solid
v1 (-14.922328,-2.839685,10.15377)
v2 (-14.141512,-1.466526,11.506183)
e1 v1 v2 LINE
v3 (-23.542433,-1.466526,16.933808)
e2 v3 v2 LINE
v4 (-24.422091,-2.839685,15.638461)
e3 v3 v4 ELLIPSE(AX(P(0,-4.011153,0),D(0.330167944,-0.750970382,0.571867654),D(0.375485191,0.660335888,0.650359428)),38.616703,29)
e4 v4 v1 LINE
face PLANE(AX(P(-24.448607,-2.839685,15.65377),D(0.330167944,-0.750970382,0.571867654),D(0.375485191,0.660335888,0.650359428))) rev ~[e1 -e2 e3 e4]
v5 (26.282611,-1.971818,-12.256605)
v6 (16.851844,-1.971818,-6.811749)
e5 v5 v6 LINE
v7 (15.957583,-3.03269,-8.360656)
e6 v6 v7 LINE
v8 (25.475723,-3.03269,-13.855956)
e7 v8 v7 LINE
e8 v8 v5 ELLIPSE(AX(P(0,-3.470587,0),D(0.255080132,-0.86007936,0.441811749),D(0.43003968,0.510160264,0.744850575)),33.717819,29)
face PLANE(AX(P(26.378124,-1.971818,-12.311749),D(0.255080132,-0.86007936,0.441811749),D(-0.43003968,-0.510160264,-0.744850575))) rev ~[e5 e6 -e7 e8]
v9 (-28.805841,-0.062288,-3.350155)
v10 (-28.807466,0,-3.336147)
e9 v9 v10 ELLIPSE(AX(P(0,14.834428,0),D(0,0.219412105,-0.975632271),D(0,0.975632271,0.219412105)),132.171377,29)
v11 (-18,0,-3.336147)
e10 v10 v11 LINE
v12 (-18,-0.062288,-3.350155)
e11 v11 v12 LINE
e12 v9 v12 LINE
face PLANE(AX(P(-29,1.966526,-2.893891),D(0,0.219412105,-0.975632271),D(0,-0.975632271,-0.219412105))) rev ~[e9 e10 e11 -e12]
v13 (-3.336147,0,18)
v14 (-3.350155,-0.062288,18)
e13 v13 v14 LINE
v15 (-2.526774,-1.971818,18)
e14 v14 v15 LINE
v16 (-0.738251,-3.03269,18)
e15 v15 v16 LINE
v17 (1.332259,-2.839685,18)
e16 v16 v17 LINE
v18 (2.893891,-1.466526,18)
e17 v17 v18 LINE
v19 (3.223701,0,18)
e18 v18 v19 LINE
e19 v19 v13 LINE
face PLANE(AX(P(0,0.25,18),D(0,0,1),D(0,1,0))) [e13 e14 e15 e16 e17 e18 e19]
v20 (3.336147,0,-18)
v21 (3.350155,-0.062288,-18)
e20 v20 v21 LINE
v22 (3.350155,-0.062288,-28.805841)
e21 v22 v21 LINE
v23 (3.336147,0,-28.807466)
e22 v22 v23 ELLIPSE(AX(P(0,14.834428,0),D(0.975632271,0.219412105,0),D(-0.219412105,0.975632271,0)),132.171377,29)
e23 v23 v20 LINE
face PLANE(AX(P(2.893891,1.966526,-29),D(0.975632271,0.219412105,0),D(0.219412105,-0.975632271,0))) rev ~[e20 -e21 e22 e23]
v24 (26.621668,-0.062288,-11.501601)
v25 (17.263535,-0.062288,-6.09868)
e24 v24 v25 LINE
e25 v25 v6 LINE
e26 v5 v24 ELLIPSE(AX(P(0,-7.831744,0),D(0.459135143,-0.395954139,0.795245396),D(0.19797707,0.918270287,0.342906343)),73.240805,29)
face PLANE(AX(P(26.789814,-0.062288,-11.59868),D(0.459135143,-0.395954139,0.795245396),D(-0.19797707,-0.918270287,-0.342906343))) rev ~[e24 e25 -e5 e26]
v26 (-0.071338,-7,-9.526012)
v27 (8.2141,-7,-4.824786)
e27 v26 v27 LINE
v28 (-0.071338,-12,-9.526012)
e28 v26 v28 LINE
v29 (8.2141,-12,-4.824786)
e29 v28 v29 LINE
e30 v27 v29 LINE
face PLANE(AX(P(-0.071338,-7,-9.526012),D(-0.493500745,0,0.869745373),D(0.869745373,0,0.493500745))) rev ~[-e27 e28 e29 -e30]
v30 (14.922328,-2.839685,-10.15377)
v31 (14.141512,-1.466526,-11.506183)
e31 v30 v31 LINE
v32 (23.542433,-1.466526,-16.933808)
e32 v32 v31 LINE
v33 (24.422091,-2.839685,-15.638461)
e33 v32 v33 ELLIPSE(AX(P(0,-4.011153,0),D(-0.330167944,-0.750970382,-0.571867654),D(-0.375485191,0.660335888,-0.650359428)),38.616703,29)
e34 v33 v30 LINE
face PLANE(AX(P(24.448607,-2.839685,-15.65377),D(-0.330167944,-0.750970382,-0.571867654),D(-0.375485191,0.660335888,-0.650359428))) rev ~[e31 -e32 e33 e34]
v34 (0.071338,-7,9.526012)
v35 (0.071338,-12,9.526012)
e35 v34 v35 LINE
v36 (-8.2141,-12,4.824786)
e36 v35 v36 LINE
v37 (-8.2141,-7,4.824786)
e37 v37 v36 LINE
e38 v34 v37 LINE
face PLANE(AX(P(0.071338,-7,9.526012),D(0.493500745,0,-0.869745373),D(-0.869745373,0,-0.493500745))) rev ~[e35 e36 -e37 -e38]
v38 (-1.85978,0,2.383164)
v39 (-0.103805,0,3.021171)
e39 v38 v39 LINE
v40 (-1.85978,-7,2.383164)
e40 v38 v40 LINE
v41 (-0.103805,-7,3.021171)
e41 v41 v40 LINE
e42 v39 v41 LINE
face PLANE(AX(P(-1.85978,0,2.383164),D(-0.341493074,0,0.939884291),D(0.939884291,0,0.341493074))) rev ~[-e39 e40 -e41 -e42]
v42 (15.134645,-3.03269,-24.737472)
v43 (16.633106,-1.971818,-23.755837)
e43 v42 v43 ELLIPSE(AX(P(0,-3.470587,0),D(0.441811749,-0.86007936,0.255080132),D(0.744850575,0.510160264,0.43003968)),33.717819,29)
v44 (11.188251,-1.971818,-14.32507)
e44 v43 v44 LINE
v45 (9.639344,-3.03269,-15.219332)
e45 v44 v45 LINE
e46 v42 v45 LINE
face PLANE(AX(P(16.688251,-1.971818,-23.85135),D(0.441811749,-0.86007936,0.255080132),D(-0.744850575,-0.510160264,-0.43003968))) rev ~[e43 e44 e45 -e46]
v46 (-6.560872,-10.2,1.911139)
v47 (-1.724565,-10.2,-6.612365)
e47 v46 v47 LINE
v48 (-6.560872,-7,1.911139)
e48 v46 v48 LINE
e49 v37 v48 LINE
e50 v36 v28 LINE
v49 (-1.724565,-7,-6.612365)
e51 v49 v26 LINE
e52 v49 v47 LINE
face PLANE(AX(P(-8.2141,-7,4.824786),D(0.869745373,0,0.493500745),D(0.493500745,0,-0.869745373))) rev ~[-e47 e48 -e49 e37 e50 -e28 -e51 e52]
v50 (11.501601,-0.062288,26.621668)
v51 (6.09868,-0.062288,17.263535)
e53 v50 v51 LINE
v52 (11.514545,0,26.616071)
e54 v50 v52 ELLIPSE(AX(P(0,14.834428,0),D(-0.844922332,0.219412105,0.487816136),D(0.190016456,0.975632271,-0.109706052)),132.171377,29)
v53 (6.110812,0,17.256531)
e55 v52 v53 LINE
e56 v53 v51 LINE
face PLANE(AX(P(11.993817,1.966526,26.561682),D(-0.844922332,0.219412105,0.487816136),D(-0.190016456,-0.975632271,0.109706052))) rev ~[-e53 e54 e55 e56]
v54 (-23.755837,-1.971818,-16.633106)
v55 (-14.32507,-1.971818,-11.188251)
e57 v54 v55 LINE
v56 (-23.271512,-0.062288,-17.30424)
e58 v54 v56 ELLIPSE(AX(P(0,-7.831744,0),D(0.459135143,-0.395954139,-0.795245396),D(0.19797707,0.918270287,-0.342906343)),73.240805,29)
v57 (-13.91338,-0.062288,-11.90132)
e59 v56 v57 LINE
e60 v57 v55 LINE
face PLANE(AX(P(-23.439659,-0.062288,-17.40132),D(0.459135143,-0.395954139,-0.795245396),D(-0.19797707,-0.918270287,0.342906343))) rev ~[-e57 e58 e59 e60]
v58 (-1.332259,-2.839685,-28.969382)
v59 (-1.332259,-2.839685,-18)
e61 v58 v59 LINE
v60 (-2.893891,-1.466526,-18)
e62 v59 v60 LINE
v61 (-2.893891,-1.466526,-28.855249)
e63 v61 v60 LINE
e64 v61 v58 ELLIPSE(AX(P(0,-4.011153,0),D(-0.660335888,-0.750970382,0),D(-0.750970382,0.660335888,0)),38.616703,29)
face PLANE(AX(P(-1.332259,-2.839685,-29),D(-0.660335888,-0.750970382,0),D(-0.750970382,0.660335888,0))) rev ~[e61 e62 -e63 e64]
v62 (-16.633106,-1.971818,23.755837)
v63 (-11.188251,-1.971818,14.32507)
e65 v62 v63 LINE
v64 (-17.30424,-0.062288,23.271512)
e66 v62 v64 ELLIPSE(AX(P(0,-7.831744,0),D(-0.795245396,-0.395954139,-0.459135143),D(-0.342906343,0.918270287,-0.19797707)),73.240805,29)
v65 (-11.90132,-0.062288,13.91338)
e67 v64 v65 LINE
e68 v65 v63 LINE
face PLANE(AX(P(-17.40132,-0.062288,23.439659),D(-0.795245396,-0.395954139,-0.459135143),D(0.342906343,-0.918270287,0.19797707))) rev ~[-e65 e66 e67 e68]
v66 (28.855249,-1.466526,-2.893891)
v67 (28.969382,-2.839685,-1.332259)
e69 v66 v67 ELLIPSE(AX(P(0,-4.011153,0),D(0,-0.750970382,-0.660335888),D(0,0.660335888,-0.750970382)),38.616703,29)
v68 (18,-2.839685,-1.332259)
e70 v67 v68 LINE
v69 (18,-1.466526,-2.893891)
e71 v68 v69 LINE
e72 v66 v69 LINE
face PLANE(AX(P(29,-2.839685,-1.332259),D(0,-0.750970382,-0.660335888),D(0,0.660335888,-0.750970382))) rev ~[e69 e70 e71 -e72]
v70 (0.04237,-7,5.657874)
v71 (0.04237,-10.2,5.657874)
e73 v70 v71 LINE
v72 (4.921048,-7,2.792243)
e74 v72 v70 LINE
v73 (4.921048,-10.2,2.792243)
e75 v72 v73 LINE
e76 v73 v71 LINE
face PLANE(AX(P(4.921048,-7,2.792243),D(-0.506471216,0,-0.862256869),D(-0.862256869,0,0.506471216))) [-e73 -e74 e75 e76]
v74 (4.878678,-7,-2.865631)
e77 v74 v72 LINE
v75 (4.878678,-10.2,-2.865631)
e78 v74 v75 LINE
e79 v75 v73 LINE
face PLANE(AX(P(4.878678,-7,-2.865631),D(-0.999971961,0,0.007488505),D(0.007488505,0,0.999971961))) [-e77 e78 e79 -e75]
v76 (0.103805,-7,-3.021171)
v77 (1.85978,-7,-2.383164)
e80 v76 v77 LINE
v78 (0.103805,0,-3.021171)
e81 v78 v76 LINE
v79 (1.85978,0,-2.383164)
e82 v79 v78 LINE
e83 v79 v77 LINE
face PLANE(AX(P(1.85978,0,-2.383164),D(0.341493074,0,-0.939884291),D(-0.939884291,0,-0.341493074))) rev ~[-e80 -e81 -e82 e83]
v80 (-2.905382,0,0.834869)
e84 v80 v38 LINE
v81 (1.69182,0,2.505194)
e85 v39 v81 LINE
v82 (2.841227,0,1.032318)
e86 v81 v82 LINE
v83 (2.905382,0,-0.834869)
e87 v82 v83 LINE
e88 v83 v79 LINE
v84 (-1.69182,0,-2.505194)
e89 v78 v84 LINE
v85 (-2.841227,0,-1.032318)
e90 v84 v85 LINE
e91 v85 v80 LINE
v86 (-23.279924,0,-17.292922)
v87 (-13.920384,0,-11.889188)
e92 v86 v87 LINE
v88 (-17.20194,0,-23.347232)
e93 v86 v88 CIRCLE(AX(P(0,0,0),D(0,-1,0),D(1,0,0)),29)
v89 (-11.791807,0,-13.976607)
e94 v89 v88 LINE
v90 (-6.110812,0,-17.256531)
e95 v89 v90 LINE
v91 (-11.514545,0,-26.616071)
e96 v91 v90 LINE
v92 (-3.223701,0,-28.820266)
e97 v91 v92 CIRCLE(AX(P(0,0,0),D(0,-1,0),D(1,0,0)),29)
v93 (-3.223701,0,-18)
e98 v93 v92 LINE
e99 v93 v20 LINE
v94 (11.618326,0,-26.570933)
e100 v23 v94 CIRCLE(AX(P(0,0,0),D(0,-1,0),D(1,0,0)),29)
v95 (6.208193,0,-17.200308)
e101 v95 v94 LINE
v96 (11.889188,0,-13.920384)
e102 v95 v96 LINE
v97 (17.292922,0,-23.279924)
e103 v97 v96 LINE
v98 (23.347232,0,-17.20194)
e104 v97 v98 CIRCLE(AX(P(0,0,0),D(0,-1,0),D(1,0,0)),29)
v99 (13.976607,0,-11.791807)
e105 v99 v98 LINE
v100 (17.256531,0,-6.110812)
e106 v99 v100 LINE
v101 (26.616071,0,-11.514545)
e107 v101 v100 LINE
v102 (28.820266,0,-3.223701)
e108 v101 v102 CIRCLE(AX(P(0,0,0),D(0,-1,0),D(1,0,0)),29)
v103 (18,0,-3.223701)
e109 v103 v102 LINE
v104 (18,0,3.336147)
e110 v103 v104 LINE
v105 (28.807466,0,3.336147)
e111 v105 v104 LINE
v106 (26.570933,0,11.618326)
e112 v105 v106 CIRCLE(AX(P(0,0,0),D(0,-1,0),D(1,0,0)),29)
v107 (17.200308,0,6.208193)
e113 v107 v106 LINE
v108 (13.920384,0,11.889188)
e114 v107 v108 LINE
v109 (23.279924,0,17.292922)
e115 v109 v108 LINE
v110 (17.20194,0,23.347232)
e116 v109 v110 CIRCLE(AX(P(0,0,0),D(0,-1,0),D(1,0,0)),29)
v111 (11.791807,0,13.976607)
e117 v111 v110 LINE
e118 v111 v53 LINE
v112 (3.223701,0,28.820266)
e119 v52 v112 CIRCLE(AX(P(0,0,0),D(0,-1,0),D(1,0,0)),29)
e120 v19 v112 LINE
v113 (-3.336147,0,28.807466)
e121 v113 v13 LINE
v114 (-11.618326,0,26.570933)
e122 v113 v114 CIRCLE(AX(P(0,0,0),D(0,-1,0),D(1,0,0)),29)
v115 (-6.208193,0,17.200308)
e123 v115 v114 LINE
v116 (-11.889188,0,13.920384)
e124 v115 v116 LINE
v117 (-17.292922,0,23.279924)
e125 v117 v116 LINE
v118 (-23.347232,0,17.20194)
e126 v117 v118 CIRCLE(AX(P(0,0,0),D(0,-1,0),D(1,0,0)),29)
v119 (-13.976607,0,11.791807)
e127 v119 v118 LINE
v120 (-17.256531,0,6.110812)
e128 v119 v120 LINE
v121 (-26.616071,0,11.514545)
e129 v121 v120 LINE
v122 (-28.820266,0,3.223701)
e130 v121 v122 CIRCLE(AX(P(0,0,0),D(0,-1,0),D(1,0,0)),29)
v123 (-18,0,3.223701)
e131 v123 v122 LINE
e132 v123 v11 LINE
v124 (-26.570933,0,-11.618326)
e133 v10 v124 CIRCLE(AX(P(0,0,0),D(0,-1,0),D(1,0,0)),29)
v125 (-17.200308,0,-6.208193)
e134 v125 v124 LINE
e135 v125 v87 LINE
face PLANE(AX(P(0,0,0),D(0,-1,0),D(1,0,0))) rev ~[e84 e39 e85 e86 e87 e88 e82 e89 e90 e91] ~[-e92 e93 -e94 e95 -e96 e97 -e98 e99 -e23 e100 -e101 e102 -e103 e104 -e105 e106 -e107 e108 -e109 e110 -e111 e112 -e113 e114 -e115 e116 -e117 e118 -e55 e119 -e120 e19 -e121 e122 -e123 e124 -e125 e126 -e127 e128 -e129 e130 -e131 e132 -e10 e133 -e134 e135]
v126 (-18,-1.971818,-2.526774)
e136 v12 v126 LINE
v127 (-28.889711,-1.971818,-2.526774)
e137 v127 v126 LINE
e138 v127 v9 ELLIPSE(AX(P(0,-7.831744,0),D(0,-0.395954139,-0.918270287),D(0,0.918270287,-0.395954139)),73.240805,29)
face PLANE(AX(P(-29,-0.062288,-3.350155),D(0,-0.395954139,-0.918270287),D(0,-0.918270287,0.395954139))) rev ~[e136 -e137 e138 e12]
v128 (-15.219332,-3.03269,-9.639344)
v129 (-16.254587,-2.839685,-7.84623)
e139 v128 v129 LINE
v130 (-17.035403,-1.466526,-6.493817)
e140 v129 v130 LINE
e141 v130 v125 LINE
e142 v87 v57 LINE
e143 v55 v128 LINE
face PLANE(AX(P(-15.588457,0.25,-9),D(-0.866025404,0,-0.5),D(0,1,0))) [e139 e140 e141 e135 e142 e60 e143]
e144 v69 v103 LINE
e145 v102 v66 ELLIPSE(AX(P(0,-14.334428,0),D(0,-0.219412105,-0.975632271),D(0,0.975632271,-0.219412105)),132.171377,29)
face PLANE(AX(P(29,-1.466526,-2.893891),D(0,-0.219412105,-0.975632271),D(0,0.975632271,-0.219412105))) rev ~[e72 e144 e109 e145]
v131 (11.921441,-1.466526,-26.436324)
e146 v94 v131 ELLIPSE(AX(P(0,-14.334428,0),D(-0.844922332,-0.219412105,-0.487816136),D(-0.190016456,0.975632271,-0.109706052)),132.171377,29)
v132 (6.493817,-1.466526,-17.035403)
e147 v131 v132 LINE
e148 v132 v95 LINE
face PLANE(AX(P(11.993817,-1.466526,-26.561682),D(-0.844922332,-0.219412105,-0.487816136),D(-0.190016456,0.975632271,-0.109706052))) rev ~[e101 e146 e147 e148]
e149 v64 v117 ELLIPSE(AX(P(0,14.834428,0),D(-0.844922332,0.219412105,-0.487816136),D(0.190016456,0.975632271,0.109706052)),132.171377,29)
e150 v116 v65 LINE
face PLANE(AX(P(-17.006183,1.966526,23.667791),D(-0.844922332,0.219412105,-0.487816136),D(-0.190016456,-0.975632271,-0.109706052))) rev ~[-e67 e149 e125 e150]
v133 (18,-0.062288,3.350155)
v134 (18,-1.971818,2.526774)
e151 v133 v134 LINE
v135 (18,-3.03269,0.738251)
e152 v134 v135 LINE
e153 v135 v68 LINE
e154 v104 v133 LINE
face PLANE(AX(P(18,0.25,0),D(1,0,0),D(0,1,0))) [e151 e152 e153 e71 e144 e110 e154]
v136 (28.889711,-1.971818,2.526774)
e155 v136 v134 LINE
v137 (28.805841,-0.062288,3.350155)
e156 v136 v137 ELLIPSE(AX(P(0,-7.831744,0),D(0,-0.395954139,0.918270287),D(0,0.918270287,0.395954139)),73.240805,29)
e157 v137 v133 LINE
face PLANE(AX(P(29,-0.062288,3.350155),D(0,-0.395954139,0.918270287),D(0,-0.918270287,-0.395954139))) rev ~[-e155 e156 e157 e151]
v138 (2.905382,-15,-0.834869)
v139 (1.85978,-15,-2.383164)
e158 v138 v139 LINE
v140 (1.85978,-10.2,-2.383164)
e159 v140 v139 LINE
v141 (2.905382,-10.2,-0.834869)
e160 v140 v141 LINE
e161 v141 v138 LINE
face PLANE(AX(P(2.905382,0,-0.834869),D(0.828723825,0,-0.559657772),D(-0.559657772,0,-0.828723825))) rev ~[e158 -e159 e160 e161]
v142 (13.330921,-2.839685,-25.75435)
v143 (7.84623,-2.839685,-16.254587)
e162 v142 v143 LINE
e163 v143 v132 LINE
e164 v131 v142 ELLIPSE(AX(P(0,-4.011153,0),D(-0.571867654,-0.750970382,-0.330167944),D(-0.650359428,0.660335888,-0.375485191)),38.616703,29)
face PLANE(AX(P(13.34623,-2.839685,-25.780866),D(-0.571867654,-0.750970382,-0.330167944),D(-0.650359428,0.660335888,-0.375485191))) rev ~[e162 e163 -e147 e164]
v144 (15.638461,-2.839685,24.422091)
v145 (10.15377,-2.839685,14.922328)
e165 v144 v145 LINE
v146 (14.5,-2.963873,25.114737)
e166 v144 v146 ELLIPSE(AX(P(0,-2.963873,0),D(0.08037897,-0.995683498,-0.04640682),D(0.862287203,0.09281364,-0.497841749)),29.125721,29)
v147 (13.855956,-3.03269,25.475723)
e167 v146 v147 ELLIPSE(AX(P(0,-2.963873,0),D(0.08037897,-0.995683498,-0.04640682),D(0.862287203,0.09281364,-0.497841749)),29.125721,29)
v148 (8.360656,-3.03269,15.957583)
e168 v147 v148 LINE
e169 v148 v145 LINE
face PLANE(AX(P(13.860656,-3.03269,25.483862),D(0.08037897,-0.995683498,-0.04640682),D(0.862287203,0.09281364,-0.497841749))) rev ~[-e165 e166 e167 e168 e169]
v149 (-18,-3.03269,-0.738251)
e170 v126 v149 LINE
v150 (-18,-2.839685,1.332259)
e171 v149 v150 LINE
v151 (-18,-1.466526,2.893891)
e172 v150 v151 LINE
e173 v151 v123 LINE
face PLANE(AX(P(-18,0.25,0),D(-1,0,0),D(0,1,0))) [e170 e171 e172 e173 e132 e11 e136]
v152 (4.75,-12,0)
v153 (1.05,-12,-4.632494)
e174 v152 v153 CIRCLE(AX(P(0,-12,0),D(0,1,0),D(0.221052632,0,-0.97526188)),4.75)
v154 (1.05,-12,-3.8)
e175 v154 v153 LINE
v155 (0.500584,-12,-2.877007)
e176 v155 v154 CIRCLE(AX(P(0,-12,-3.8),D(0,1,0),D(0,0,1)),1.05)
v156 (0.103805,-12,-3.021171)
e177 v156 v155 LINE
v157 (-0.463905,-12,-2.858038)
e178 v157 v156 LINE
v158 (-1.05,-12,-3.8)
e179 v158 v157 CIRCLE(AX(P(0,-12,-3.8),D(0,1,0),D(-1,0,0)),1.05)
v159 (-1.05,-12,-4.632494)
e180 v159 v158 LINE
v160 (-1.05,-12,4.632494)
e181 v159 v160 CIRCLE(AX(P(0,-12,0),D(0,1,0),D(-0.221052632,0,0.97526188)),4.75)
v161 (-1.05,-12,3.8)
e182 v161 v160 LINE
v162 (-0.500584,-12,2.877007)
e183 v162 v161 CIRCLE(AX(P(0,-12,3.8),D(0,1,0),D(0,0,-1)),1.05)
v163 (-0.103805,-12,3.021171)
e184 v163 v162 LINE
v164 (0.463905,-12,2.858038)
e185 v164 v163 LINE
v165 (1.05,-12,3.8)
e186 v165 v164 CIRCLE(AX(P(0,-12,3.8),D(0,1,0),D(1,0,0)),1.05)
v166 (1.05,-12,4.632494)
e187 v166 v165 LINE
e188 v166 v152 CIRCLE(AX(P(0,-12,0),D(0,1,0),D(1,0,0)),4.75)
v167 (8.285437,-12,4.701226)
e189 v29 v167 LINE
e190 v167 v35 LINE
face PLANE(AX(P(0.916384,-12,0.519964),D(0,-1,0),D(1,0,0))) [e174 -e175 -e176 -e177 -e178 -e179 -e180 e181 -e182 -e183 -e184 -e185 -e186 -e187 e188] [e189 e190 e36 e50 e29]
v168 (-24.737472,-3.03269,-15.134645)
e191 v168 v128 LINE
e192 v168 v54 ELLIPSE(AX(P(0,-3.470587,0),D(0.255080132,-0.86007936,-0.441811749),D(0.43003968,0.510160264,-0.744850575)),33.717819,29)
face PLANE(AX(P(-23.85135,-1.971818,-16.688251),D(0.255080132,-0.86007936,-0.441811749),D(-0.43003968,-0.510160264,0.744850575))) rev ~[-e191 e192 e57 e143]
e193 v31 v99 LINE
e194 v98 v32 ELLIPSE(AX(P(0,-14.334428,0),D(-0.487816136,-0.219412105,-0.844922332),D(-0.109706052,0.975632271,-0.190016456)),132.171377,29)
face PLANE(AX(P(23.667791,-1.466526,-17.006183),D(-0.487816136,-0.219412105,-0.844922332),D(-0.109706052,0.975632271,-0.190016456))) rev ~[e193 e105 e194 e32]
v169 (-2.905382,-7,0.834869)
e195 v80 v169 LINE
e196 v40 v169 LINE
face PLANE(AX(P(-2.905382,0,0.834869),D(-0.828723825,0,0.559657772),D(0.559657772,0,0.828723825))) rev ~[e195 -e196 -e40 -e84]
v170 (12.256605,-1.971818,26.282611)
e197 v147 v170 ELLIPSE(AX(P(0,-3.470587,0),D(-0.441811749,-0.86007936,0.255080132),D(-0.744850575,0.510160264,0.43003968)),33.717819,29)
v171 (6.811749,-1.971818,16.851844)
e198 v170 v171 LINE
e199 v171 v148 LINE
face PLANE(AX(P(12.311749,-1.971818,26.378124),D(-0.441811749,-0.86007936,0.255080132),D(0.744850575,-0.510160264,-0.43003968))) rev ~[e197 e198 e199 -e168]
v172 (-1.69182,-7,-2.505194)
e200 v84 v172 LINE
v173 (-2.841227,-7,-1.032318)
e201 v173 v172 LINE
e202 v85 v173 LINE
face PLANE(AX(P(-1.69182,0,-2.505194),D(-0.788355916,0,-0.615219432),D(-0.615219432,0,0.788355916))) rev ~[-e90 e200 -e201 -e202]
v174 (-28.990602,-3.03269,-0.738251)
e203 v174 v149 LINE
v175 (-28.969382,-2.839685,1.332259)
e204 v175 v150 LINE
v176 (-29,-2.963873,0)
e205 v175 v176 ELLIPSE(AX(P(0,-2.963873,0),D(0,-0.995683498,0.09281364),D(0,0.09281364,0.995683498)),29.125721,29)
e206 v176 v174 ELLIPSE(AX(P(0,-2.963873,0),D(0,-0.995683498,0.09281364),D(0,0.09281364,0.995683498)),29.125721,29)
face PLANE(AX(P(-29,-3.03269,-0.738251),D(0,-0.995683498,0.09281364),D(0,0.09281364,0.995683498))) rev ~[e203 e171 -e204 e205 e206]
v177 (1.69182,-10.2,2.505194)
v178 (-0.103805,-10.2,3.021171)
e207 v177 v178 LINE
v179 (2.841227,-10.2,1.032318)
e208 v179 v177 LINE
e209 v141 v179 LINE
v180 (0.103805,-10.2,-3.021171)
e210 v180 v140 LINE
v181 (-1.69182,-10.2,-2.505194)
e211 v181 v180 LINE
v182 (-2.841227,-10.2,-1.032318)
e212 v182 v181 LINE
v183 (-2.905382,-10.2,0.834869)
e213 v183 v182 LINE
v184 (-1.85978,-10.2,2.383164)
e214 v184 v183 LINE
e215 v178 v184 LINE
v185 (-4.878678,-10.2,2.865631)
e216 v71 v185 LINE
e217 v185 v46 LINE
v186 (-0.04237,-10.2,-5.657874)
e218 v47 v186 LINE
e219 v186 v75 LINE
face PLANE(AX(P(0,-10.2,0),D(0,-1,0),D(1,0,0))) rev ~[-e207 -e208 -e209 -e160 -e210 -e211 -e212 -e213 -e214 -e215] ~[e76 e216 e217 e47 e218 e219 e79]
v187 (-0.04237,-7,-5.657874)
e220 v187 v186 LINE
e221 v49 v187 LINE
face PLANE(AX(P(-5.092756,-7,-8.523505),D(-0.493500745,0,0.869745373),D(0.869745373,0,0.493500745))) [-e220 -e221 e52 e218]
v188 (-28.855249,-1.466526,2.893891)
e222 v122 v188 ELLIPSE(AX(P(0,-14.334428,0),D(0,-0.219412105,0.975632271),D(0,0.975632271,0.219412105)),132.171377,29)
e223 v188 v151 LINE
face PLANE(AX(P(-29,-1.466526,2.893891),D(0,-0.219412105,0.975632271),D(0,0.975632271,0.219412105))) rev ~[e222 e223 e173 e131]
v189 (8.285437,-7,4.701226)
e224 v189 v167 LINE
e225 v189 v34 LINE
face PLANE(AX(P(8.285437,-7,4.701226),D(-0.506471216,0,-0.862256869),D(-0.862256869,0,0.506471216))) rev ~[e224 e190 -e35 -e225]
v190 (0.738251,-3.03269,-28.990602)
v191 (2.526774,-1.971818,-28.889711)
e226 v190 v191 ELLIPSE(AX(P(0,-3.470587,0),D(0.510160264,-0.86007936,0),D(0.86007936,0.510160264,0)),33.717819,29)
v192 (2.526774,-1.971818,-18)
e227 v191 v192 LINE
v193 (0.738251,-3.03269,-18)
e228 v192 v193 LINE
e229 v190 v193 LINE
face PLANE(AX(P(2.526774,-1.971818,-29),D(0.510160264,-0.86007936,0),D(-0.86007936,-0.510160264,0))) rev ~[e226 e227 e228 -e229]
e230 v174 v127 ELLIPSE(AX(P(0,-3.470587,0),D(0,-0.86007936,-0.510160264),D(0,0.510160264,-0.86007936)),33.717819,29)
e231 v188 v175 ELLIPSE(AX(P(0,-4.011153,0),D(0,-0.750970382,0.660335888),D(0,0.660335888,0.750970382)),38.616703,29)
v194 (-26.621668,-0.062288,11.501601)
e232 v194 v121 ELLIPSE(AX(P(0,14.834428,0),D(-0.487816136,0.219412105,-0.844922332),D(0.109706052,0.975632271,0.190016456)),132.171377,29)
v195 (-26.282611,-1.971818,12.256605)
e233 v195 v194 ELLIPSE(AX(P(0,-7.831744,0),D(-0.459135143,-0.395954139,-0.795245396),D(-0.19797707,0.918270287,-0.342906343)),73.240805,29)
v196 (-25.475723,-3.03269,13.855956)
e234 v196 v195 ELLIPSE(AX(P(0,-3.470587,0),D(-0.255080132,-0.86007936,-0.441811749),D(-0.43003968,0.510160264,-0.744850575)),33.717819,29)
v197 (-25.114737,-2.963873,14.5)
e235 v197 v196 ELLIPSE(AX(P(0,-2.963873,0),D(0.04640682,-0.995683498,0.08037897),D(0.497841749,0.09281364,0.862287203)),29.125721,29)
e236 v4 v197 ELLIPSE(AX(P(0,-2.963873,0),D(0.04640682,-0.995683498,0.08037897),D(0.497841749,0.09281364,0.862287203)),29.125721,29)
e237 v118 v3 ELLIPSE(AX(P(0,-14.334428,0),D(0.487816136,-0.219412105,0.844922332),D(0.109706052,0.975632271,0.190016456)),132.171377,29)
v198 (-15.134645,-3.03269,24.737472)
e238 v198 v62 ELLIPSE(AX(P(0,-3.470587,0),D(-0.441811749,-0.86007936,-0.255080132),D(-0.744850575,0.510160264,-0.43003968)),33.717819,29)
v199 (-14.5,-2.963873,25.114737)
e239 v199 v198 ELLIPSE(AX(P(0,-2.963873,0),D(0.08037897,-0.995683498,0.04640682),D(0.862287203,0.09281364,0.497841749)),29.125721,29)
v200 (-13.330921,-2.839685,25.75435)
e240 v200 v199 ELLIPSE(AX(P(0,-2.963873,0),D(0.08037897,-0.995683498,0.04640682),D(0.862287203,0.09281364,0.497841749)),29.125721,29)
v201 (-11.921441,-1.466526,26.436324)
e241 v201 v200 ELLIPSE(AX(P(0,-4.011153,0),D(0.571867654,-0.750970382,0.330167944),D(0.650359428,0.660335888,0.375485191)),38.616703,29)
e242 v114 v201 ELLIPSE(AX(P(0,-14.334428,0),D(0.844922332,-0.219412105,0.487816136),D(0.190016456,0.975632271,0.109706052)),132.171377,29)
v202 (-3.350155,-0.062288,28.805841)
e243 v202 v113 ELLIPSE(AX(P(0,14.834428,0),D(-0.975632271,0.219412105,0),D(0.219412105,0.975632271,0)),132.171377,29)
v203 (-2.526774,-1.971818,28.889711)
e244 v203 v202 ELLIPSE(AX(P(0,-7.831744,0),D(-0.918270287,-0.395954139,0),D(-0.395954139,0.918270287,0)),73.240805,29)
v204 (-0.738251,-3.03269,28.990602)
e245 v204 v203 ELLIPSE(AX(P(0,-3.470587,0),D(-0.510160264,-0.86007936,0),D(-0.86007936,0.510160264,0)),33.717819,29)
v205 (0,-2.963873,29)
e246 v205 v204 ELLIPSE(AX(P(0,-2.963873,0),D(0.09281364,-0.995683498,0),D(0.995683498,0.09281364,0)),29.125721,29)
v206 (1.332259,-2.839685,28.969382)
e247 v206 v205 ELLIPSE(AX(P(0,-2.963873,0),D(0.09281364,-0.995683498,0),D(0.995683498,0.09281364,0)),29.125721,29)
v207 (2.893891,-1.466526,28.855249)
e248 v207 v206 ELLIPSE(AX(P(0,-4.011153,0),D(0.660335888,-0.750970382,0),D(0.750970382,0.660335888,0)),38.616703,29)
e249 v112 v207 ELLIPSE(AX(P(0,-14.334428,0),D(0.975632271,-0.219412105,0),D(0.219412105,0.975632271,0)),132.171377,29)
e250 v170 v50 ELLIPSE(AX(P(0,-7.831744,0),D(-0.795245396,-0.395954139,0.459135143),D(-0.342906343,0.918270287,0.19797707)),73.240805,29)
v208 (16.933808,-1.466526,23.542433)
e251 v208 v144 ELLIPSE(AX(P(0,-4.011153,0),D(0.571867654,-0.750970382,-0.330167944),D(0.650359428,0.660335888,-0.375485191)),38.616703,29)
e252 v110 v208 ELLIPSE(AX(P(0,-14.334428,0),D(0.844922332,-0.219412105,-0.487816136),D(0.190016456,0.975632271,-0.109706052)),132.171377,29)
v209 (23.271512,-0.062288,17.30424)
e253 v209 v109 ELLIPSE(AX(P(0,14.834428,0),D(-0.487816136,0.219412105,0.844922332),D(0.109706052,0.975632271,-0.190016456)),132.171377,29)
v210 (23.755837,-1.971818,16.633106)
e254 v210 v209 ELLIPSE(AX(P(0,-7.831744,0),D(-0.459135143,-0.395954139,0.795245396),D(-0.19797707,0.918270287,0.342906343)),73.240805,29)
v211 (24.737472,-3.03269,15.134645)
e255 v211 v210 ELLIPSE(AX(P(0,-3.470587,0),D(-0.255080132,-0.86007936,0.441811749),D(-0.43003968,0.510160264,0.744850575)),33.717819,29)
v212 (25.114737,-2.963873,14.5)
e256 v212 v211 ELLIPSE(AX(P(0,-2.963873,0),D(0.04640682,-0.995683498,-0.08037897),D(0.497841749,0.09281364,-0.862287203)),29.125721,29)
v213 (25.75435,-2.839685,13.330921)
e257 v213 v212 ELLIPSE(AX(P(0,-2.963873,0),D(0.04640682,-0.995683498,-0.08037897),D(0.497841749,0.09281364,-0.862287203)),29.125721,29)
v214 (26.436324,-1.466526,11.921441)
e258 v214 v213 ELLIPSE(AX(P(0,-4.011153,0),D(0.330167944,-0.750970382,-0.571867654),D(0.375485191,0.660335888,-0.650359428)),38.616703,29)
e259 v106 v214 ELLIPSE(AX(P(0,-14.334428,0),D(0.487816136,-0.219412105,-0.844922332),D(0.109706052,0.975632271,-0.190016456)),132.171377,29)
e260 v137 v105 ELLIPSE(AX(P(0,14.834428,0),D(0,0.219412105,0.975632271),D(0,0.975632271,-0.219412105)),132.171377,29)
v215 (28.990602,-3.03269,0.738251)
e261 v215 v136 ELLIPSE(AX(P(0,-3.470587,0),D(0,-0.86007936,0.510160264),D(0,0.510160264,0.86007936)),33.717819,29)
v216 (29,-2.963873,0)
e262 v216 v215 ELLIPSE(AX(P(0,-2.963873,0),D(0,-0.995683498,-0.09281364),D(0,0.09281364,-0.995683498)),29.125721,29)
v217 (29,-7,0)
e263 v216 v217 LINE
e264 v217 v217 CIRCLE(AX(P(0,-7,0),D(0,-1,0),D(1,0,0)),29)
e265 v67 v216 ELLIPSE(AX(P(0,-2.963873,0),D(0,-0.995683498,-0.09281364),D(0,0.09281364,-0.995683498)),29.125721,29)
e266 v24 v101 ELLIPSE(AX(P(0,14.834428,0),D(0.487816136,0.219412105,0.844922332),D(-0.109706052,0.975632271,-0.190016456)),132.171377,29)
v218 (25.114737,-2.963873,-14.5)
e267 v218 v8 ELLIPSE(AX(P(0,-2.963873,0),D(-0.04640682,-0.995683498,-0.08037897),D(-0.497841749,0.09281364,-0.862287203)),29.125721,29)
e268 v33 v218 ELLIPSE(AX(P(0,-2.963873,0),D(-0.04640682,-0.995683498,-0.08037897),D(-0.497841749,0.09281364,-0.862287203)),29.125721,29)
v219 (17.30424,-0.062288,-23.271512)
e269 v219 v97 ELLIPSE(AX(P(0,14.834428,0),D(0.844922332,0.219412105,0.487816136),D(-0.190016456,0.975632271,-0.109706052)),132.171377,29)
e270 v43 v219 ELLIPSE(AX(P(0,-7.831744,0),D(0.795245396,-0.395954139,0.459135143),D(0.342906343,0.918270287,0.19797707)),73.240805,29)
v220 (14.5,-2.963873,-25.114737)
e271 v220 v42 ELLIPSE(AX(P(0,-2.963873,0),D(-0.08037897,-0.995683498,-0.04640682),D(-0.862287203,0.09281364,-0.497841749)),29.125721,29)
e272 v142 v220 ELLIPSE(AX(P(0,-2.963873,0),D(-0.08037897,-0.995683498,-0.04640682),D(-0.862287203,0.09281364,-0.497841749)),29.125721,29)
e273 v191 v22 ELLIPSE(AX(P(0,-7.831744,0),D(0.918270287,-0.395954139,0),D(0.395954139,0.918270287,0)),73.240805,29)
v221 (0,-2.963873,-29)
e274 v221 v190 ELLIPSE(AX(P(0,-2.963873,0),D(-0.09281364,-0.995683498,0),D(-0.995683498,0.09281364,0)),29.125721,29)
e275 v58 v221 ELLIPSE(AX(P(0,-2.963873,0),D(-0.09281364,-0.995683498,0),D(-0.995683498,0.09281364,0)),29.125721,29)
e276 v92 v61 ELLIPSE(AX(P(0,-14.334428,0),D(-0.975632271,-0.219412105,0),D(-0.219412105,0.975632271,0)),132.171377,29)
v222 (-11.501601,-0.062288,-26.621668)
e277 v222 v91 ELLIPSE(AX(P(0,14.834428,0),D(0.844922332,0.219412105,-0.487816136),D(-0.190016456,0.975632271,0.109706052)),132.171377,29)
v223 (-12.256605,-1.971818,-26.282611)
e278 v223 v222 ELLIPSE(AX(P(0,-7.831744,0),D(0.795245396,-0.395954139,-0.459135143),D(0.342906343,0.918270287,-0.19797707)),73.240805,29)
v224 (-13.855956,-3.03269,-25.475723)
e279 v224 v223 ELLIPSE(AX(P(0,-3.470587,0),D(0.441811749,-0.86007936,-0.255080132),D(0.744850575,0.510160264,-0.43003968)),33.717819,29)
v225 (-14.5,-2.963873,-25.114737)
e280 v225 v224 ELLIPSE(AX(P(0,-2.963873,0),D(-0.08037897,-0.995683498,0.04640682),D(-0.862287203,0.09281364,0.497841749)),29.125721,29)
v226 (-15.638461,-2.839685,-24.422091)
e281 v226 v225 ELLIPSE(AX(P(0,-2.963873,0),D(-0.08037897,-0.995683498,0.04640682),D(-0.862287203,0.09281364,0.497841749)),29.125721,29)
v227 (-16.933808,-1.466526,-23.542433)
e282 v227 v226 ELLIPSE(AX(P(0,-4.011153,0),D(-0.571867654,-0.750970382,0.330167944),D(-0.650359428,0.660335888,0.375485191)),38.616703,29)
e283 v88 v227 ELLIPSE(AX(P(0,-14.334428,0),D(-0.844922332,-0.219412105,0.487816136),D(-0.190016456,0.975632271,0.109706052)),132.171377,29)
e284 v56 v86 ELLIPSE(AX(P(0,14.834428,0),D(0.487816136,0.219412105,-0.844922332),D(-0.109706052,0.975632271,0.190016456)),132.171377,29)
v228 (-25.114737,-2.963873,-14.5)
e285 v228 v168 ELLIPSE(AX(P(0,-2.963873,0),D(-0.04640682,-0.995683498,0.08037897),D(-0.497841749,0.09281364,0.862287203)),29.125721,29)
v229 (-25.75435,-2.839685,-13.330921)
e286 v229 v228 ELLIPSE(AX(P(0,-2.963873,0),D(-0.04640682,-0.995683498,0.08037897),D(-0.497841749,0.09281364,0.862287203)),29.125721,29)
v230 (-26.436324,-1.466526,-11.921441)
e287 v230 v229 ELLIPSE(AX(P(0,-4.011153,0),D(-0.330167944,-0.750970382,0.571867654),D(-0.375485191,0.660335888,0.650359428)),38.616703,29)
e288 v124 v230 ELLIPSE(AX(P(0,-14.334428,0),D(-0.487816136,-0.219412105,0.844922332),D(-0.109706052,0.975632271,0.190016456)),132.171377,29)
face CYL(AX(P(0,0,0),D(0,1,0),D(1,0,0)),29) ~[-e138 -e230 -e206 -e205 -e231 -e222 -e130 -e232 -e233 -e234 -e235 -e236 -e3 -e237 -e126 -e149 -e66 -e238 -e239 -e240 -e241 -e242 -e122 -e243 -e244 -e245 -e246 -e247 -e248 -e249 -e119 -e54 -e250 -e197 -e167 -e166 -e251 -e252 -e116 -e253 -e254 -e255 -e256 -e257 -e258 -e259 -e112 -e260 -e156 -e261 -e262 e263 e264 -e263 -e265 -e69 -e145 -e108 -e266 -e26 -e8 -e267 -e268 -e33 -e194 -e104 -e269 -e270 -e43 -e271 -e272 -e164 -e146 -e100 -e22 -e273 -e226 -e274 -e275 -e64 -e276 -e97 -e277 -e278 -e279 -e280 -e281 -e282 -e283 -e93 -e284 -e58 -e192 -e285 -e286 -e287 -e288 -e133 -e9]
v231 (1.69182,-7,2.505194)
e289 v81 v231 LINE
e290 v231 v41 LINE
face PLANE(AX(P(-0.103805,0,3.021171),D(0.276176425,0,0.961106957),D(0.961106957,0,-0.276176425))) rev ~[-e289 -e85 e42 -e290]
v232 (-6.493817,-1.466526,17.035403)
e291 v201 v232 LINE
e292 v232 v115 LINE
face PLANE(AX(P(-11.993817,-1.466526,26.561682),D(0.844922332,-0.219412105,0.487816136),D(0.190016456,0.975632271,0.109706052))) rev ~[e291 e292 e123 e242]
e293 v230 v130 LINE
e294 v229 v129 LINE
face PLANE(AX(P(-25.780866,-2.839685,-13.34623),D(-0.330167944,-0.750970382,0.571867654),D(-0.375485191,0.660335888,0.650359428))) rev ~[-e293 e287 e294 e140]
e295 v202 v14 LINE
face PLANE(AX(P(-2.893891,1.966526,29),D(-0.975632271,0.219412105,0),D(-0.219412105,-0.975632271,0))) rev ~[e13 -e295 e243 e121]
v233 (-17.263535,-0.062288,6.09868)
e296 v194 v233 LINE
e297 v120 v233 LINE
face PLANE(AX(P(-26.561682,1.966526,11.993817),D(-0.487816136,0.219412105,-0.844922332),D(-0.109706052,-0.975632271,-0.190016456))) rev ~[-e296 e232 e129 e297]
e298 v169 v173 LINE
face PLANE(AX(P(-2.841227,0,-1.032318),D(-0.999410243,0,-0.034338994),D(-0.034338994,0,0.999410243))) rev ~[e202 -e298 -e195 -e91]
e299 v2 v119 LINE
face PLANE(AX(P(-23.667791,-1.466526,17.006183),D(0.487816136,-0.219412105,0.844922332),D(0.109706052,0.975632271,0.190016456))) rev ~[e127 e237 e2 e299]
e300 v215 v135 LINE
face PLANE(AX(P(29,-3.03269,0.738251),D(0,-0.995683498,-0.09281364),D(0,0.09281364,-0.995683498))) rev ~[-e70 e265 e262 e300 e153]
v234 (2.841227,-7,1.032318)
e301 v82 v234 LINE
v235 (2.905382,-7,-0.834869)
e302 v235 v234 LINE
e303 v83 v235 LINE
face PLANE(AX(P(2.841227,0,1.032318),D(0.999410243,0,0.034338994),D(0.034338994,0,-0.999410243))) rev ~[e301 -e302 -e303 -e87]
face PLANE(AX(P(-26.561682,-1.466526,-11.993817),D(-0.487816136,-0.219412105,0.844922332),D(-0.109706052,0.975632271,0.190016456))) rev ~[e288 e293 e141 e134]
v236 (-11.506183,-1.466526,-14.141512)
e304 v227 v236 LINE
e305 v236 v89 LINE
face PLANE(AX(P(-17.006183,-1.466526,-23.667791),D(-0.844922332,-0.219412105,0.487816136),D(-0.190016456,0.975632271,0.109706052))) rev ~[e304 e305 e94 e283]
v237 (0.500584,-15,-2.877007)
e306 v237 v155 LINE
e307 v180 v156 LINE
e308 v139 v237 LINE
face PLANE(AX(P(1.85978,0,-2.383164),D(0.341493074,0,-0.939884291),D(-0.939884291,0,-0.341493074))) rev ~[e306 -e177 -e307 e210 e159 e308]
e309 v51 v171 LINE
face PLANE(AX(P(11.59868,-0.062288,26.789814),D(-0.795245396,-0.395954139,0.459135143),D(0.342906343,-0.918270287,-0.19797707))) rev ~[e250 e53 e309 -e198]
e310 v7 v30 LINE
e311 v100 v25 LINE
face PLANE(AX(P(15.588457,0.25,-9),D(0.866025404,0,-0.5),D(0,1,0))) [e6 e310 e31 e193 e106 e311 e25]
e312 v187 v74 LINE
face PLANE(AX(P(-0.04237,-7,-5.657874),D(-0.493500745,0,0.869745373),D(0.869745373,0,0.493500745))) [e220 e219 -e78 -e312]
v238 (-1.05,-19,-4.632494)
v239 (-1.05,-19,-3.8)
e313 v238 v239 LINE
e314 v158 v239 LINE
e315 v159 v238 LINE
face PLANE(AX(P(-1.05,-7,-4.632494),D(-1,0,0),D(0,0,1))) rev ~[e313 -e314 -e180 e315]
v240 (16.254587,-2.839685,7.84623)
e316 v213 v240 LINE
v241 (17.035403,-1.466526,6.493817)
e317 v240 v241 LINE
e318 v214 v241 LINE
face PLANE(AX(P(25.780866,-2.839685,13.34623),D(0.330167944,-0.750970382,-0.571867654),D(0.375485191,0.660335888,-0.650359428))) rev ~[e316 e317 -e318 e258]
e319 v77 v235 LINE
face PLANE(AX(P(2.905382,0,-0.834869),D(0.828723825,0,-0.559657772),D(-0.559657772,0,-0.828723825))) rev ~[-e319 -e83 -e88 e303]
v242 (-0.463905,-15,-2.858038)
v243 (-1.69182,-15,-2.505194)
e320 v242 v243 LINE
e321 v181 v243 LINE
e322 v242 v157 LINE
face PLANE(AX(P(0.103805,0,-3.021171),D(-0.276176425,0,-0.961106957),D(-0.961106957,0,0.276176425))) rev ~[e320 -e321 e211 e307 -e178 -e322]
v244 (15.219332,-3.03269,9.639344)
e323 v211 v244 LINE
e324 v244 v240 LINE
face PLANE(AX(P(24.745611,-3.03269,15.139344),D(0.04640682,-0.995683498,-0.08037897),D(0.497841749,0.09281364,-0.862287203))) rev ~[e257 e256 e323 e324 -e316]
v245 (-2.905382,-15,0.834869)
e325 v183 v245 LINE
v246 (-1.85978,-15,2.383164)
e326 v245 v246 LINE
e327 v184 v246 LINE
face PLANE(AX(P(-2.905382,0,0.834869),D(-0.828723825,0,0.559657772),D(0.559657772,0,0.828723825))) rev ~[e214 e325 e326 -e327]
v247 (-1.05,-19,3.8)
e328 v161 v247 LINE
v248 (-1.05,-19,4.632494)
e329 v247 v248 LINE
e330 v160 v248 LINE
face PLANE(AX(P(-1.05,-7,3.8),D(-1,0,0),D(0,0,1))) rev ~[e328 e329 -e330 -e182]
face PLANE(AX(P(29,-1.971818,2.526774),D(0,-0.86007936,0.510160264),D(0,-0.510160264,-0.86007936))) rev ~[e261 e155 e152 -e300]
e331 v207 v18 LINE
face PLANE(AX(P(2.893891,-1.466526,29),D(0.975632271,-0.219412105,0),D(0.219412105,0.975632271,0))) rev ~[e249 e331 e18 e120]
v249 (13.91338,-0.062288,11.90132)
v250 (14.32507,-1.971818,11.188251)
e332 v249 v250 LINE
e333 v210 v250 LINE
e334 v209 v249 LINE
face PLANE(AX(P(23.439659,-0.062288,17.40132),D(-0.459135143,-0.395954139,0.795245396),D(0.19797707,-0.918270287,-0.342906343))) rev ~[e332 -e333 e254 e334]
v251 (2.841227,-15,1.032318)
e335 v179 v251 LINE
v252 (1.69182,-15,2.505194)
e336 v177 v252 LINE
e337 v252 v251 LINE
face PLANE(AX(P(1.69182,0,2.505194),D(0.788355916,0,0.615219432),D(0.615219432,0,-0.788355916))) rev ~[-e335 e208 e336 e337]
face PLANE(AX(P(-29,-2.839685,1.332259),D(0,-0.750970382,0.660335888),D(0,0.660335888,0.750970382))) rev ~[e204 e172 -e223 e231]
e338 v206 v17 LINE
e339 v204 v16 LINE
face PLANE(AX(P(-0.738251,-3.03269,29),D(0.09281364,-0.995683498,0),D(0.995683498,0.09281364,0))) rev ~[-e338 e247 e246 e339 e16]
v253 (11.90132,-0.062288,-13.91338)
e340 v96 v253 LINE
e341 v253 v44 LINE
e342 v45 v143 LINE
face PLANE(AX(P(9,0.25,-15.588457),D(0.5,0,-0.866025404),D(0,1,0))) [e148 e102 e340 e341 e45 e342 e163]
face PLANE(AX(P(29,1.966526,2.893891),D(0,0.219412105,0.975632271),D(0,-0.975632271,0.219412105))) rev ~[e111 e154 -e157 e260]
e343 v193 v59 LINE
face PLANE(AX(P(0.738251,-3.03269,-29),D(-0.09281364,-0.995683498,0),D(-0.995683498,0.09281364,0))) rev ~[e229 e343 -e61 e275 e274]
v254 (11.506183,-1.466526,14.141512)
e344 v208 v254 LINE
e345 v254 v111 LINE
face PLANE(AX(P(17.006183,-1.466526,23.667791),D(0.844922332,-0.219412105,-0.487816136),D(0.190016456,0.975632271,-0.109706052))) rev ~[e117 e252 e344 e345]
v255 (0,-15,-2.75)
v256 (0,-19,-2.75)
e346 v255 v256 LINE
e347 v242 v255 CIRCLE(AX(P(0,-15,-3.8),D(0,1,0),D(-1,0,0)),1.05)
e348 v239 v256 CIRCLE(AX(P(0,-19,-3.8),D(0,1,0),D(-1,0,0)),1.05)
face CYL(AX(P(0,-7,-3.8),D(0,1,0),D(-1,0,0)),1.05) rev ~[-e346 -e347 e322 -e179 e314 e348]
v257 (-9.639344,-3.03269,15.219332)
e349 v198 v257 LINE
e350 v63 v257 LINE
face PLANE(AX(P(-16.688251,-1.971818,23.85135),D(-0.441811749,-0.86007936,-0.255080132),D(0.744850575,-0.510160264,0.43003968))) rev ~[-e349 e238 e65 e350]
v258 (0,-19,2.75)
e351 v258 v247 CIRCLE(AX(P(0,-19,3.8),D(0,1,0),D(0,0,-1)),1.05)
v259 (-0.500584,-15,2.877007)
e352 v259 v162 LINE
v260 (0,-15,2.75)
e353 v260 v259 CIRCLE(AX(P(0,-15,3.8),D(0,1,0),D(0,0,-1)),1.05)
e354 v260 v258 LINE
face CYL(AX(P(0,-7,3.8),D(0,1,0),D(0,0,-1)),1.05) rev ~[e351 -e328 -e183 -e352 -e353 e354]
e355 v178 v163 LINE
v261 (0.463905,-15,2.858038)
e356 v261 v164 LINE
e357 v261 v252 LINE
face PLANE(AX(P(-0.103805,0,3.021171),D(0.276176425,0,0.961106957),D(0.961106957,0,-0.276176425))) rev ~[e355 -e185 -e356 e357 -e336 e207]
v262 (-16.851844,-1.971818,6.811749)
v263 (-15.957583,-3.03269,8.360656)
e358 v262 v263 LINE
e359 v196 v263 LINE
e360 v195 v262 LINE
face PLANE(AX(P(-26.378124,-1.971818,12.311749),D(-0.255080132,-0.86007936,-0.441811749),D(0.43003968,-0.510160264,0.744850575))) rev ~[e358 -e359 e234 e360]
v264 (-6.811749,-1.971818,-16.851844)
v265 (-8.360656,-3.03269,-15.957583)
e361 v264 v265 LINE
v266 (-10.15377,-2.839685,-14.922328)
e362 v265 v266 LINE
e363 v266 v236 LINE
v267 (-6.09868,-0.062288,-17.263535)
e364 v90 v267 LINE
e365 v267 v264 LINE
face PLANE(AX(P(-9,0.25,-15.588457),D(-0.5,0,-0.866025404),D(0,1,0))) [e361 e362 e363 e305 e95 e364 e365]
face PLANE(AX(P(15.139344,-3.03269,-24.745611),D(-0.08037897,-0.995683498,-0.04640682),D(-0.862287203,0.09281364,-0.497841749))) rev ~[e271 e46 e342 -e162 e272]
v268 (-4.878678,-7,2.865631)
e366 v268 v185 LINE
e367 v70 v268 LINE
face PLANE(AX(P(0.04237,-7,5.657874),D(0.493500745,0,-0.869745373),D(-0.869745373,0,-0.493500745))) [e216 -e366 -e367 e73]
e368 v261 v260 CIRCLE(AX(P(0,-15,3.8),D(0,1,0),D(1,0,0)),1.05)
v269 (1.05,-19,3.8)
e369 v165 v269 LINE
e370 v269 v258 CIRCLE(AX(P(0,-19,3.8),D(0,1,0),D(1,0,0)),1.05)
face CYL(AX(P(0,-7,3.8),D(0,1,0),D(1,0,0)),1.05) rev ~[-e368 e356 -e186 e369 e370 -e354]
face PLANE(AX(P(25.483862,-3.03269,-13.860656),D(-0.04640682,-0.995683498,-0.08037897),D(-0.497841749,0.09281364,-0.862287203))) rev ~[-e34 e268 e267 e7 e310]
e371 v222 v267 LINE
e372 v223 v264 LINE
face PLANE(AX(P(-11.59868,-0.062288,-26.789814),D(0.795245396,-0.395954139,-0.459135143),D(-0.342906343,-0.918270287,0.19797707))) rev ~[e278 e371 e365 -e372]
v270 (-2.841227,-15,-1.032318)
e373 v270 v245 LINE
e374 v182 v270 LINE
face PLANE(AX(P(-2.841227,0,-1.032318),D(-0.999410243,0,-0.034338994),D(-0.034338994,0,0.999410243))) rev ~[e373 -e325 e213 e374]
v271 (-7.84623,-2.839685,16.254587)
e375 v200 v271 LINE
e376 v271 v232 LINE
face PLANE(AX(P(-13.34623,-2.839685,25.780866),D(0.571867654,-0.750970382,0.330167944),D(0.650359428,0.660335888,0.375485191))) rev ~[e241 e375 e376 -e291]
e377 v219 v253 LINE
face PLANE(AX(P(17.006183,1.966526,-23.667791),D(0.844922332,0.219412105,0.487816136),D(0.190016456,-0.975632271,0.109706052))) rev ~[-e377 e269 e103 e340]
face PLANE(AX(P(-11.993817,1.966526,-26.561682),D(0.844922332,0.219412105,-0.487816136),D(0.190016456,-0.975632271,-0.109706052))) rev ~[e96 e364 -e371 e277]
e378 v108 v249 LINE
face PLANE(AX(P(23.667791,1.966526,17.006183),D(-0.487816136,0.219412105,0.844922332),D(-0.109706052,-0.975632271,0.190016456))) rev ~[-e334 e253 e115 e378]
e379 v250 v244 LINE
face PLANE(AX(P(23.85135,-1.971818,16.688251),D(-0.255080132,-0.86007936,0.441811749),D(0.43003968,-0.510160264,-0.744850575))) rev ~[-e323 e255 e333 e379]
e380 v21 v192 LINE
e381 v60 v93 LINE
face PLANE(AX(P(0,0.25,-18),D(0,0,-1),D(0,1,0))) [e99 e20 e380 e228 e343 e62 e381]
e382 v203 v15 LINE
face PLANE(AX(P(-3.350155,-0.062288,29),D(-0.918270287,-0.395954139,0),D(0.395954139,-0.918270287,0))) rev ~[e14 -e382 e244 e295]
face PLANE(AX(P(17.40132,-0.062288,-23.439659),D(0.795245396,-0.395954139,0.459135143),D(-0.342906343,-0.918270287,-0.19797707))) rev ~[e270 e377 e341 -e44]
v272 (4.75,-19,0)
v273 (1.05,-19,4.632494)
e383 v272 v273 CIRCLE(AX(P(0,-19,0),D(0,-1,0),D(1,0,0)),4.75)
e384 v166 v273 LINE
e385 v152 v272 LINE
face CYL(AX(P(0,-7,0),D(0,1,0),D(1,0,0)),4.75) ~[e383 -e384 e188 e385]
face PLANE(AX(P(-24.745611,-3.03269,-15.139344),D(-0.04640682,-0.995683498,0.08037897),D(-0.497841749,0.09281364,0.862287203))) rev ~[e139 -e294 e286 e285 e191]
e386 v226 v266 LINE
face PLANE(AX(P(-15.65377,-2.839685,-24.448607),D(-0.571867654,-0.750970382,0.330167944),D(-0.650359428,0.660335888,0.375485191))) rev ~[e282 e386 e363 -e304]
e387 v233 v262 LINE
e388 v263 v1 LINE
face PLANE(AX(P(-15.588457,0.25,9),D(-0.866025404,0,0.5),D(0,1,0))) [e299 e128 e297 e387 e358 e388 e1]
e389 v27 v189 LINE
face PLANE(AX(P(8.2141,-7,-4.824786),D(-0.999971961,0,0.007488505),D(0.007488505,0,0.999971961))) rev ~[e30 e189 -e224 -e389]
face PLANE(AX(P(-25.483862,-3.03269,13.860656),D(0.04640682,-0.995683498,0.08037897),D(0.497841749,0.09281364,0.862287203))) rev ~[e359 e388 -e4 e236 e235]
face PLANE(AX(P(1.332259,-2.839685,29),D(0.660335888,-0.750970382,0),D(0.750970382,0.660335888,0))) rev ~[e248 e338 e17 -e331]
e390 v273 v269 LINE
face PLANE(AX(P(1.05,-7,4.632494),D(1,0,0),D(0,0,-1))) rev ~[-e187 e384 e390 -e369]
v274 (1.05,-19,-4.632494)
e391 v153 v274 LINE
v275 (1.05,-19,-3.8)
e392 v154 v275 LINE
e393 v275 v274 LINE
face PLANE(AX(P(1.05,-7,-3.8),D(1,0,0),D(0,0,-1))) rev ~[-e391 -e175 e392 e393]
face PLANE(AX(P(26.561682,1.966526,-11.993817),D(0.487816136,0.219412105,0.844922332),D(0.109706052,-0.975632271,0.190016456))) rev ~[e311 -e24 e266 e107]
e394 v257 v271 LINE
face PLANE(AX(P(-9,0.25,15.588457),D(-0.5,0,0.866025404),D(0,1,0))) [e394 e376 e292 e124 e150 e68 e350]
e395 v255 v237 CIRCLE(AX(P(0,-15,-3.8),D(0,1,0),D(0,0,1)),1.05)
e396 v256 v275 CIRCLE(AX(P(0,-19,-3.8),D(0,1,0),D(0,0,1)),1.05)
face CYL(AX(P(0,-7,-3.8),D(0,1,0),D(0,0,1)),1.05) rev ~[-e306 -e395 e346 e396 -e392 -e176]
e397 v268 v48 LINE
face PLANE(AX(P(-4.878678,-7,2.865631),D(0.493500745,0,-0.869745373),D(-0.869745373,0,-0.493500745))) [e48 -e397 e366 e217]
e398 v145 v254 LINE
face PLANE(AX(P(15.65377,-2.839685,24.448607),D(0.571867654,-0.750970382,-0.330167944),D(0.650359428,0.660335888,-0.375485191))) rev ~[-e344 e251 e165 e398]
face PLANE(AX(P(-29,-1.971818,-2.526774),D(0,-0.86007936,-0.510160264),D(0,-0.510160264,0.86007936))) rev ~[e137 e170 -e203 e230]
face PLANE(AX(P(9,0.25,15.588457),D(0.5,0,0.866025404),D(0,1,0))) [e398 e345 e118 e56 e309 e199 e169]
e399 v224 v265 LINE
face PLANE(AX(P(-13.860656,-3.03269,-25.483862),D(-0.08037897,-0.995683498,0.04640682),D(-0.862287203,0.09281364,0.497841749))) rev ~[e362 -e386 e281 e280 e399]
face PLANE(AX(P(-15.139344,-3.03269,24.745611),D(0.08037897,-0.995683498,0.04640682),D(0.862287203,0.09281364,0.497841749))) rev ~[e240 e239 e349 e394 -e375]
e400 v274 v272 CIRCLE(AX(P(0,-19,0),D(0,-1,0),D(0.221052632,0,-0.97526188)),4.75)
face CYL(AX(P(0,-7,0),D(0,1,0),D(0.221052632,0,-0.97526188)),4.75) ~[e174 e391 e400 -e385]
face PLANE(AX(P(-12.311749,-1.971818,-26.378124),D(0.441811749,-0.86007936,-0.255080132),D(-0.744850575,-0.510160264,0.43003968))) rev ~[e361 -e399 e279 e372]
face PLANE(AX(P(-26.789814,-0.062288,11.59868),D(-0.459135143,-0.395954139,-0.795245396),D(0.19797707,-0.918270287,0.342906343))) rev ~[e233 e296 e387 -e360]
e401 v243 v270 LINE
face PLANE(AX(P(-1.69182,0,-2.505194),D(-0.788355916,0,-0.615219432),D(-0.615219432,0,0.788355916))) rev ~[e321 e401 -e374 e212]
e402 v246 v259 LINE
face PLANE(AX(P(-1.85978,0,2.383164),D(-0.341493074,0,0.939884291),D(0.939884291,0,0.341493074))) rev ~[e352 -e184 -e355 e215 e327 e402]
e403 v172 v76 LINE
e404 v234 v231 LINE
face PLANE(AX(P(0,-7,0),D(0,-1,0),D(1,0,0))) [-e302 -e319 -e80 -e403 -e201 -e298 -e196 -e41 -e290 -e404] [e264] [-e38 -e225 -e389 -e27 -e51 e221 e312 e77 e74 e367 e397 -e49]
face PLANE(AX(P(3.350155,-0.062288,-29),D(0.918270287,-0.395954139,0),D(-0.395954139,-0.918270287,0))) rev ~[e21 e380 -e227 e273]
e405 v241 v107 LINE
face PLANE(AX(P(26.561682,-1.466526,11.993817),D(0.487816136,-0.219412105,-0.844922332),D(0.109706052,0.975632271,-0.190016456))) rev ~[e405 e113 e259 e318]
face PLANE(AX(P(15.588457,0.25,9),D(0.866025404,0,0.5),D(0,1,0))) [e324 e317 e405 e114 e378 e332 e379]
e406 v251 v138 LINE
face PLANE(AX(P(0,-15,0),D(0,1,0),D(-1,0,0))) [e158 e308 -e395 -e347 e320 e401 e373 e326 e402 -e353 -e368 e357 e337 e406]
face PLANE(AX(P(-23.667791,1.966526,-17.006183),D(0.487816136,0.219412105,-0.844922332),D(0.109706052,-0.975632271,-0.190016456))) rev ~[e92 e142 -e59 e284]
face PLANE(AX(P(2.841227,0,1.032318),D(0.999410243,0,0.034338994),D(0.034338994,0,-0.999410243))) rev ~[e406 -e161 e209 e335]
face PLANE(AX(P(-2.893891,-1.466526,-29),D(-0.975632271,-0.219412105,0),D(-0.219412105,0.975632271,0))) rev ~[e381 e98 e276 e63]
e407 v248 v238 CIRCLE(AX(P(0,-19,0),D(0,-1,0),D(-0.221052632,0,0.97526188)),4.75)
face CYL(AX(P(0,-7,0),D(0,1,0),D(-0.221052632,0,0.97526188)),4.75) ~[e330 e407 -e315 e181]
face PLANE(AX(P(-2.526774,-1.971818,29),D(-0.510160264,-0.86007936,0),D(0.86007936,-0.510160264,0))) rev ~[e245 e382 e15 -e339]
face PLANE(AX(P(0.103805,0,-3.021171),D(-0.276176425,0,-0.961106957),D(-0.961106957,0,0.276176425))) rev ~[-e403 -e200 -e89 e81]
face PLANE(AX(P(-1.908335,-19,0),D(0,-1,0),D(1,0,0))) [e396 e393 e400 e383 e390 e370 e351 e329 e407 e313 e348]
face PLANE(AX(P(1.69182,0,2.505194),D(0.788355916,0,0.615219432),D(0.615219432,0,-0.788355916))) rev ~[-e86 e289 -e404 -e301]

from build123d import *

# Parameters (mm, degrees)
F0_R            = 29
F1_DEPTH        = 7
F3_DEPTH        = 12
F6_DEPTH        = 11
F6_COPIES_COUNT = 12
F9_DEPTH        = 5
F11_DEPTH       = 3.2
F13_DEPTH       = 15


# Not quite as in the source:
# - a pattern or mirror of a feature is missing from the dataset's text; its kind, count and spacing are read off the source's solid


with BuildPart() as f1:
    # F0 (on Front) → F1 (new body)
    with BuildSketch(Plane.XZ):
        Circle(F0_R)
    extrude(amount=F1_DEPTH)

    # F2 (on face) → F3 (join)
    with BuildSketch(Plane.XZ.offset(7)):
        with BuildLine():
            Line((0, -2.75), (0, 2.75))
            ThreePointArc((0, 2.75), (-0.7424621202, 3.0575378798), (-1.05, 3.8))
            Line((-1.05, 3.8), (-1.05, 4.6324939288))
            ThreePointArc((-1.05, 4.6324939288), (-4.75, 0), (-1.05, -4.6324939288))
            Line((-1.05, -4.6324939288), (-1.05, -3.8))
            ThreePointArc((-1.05, -3.8), (-0.7424621202, -3.0575378798), (0, -2.75))
        make_face()
        with BuildLine():
            ThreePointArc((1.05, -4.6324939288), (3.711468712, -2.9643717716), (4.75, 0))
            ThreePointArc((4.75, 0), (3.711468712, 2.9643717716), (1.05, 4.6324939288))
            Line((1.05, 4.6324939288), (1.05, 3.8))
            ThreePointArc((1.05, 3.8), (0.7424621202, 3.0575378798), (0, 2.75))
            Line((0, 2.75), (0, -2.75))
            ThreePointArc((0, -2.75), (0.7424621202, -3.0575378798), (1.05, -3.8))
            Line((1.05, -3.8), (1.05, -4.6324939288))
        make_face()
    extrude(amount=F3_DEPTH)

    # F5 (on offset) → F6 (cut)
    with BuildSketch(Plane.YZ.offset(29)):
        Polygon((-2.8396848584, -1.3322586236), (-1.4665255865, -2.8938910614), (0.5622881169, -3.3501554734), (2.4718183739, -2.5267743623), (3.5326895289, -0.7382513266), (3.3396848584, 1.3322586236), (1.9665255865, 2.8938910614), (-0.0622881169, 3.3501554734), (-1.9718183739, 2.5267743623), (-3.0326895289, 0.7382513266), align=None)
    f6 = extrude(amount=-F6_DEPTH, mode=Mode.SUBTRACT)

    # F6_copies: F6 ×12 about axis
    f6_copies_axis = Axis((0, 0, 0), (0, 1, 0))
    for i in range(1, F6_COPIES_COUNT):
        add(f6.rotate(f6_copies_axis, i * 360 / F6_COPIES_COUNT), mode=Mode.SUBTRACT)

    # F8 (on face) → F9 (join)
    with BuildSketch(Plane.XZ.offset(7)):
        Polygon((8.2854374709, 4.7012260014), (0.0713375892, 9.5260123319), (-8.2140998816, 4.8247863305), (-0.0713375892, -9.5260123319), (8.2140998816, -4.8247863305), align=None)
        with BuildLine():
            ThreePointArc((-1.05, -4.6324939288), (-4.75, 0), (-1.05, 4.6324939288))
            Line((-1.05, 4.6324939288), (-1.05, 3.8))
            ThreePointArc((-1.05, 3.8), (0, 2.75), (1.05, 3.8))
            Line((1.05, 3.8), (1.05, 4.6324939288))
            ThreePointArc((1.05, 4.6324939288), (4.75, 0), (1.05, -4.6324939288))
            Line((1.05, -4.6324939288), (1.05, -3.8))
            ThreePointArc((1.05, -3.8), (0, -2.75), (-1.05, -3.8))
            Line((-1.05, -3.8), (-1.05, -4.6324939288))
        make_face(mode=Mode.SUBTRACT)
        with BuildLine():
            Line((-1.05, 3.8), (-1.05, 4.6324939288))
            ThreePointArc((-1.05, 4.6324939288), (-4.75, 0), (-1.05, -4.6324939288))
            Line((-1.05, -4.6324939288), (-1.05, -3.8))
            ThreePointArc((-1.05, -3.8), (0, -2.75), (1.05, -3.8))
            Line((1.05, -3.8), (1.05, -4.6324939288))
            ThreePointArc((1.05, -4.6324939288), (4.75, 0), (1.05, 4.6324939288))
            Line((1.05, 4.6324939288), (1.05, 3.8))
            ThreePointArc((1.05, 3.8), (0, 2.75), (-1.05, 3.8))
        make_face()
    extrude(amount=F9_DEPTH)

    # F10 (on face) → F11 (cut)
    with BuildSketch(Plane.XZ.offset(7)):
        Polygon((4.92104771, 2.7922433221), (0.0423702045, 5.6578739911), (-4.8786775054, 2.865630669), (-4.92104771, -2.7922433221), (-0.0423702045, -5.6578739911), (4.8786775054, -2.865630669), align=None)
        Polygon((-4.92104771, -2.7922433221), (-4.8786775054, 2.865630669), (-9.9290630252, 0), (-5.0927557243, -8.5235046601), (-0.0423702045, -5.6578739911), align=None)
    extrude(amount=F11_DEPTH, mode=Mode.SUBTRACT)

    # F12 (on face) → F13 (cut)
    with BuildSketch(Plane(origin=(0, 0, 0), x_dir=(-1, 0, 0), z_dir=(0, 1, 0))):
        Polygon((2.9053820181, 0.8348685994), (1.8597799775, 2.3831635875), (0.103805197, 3.0211710859), (-1.6918196405, 2.5051939154), (-2.8412268781, 1.0323178175), (-2.9053820181, -0.8348685994), (-1.8597799775, -2.3831635875), (-0.103805197, -3.0211710859), (1.6918196405, -2.5051939154), (2.8412268781, -1.0323178175), align=None)
    extrude(amount=-F13_DEPTH, mode=Mode.SUBTRACT)


solid = f1.part
